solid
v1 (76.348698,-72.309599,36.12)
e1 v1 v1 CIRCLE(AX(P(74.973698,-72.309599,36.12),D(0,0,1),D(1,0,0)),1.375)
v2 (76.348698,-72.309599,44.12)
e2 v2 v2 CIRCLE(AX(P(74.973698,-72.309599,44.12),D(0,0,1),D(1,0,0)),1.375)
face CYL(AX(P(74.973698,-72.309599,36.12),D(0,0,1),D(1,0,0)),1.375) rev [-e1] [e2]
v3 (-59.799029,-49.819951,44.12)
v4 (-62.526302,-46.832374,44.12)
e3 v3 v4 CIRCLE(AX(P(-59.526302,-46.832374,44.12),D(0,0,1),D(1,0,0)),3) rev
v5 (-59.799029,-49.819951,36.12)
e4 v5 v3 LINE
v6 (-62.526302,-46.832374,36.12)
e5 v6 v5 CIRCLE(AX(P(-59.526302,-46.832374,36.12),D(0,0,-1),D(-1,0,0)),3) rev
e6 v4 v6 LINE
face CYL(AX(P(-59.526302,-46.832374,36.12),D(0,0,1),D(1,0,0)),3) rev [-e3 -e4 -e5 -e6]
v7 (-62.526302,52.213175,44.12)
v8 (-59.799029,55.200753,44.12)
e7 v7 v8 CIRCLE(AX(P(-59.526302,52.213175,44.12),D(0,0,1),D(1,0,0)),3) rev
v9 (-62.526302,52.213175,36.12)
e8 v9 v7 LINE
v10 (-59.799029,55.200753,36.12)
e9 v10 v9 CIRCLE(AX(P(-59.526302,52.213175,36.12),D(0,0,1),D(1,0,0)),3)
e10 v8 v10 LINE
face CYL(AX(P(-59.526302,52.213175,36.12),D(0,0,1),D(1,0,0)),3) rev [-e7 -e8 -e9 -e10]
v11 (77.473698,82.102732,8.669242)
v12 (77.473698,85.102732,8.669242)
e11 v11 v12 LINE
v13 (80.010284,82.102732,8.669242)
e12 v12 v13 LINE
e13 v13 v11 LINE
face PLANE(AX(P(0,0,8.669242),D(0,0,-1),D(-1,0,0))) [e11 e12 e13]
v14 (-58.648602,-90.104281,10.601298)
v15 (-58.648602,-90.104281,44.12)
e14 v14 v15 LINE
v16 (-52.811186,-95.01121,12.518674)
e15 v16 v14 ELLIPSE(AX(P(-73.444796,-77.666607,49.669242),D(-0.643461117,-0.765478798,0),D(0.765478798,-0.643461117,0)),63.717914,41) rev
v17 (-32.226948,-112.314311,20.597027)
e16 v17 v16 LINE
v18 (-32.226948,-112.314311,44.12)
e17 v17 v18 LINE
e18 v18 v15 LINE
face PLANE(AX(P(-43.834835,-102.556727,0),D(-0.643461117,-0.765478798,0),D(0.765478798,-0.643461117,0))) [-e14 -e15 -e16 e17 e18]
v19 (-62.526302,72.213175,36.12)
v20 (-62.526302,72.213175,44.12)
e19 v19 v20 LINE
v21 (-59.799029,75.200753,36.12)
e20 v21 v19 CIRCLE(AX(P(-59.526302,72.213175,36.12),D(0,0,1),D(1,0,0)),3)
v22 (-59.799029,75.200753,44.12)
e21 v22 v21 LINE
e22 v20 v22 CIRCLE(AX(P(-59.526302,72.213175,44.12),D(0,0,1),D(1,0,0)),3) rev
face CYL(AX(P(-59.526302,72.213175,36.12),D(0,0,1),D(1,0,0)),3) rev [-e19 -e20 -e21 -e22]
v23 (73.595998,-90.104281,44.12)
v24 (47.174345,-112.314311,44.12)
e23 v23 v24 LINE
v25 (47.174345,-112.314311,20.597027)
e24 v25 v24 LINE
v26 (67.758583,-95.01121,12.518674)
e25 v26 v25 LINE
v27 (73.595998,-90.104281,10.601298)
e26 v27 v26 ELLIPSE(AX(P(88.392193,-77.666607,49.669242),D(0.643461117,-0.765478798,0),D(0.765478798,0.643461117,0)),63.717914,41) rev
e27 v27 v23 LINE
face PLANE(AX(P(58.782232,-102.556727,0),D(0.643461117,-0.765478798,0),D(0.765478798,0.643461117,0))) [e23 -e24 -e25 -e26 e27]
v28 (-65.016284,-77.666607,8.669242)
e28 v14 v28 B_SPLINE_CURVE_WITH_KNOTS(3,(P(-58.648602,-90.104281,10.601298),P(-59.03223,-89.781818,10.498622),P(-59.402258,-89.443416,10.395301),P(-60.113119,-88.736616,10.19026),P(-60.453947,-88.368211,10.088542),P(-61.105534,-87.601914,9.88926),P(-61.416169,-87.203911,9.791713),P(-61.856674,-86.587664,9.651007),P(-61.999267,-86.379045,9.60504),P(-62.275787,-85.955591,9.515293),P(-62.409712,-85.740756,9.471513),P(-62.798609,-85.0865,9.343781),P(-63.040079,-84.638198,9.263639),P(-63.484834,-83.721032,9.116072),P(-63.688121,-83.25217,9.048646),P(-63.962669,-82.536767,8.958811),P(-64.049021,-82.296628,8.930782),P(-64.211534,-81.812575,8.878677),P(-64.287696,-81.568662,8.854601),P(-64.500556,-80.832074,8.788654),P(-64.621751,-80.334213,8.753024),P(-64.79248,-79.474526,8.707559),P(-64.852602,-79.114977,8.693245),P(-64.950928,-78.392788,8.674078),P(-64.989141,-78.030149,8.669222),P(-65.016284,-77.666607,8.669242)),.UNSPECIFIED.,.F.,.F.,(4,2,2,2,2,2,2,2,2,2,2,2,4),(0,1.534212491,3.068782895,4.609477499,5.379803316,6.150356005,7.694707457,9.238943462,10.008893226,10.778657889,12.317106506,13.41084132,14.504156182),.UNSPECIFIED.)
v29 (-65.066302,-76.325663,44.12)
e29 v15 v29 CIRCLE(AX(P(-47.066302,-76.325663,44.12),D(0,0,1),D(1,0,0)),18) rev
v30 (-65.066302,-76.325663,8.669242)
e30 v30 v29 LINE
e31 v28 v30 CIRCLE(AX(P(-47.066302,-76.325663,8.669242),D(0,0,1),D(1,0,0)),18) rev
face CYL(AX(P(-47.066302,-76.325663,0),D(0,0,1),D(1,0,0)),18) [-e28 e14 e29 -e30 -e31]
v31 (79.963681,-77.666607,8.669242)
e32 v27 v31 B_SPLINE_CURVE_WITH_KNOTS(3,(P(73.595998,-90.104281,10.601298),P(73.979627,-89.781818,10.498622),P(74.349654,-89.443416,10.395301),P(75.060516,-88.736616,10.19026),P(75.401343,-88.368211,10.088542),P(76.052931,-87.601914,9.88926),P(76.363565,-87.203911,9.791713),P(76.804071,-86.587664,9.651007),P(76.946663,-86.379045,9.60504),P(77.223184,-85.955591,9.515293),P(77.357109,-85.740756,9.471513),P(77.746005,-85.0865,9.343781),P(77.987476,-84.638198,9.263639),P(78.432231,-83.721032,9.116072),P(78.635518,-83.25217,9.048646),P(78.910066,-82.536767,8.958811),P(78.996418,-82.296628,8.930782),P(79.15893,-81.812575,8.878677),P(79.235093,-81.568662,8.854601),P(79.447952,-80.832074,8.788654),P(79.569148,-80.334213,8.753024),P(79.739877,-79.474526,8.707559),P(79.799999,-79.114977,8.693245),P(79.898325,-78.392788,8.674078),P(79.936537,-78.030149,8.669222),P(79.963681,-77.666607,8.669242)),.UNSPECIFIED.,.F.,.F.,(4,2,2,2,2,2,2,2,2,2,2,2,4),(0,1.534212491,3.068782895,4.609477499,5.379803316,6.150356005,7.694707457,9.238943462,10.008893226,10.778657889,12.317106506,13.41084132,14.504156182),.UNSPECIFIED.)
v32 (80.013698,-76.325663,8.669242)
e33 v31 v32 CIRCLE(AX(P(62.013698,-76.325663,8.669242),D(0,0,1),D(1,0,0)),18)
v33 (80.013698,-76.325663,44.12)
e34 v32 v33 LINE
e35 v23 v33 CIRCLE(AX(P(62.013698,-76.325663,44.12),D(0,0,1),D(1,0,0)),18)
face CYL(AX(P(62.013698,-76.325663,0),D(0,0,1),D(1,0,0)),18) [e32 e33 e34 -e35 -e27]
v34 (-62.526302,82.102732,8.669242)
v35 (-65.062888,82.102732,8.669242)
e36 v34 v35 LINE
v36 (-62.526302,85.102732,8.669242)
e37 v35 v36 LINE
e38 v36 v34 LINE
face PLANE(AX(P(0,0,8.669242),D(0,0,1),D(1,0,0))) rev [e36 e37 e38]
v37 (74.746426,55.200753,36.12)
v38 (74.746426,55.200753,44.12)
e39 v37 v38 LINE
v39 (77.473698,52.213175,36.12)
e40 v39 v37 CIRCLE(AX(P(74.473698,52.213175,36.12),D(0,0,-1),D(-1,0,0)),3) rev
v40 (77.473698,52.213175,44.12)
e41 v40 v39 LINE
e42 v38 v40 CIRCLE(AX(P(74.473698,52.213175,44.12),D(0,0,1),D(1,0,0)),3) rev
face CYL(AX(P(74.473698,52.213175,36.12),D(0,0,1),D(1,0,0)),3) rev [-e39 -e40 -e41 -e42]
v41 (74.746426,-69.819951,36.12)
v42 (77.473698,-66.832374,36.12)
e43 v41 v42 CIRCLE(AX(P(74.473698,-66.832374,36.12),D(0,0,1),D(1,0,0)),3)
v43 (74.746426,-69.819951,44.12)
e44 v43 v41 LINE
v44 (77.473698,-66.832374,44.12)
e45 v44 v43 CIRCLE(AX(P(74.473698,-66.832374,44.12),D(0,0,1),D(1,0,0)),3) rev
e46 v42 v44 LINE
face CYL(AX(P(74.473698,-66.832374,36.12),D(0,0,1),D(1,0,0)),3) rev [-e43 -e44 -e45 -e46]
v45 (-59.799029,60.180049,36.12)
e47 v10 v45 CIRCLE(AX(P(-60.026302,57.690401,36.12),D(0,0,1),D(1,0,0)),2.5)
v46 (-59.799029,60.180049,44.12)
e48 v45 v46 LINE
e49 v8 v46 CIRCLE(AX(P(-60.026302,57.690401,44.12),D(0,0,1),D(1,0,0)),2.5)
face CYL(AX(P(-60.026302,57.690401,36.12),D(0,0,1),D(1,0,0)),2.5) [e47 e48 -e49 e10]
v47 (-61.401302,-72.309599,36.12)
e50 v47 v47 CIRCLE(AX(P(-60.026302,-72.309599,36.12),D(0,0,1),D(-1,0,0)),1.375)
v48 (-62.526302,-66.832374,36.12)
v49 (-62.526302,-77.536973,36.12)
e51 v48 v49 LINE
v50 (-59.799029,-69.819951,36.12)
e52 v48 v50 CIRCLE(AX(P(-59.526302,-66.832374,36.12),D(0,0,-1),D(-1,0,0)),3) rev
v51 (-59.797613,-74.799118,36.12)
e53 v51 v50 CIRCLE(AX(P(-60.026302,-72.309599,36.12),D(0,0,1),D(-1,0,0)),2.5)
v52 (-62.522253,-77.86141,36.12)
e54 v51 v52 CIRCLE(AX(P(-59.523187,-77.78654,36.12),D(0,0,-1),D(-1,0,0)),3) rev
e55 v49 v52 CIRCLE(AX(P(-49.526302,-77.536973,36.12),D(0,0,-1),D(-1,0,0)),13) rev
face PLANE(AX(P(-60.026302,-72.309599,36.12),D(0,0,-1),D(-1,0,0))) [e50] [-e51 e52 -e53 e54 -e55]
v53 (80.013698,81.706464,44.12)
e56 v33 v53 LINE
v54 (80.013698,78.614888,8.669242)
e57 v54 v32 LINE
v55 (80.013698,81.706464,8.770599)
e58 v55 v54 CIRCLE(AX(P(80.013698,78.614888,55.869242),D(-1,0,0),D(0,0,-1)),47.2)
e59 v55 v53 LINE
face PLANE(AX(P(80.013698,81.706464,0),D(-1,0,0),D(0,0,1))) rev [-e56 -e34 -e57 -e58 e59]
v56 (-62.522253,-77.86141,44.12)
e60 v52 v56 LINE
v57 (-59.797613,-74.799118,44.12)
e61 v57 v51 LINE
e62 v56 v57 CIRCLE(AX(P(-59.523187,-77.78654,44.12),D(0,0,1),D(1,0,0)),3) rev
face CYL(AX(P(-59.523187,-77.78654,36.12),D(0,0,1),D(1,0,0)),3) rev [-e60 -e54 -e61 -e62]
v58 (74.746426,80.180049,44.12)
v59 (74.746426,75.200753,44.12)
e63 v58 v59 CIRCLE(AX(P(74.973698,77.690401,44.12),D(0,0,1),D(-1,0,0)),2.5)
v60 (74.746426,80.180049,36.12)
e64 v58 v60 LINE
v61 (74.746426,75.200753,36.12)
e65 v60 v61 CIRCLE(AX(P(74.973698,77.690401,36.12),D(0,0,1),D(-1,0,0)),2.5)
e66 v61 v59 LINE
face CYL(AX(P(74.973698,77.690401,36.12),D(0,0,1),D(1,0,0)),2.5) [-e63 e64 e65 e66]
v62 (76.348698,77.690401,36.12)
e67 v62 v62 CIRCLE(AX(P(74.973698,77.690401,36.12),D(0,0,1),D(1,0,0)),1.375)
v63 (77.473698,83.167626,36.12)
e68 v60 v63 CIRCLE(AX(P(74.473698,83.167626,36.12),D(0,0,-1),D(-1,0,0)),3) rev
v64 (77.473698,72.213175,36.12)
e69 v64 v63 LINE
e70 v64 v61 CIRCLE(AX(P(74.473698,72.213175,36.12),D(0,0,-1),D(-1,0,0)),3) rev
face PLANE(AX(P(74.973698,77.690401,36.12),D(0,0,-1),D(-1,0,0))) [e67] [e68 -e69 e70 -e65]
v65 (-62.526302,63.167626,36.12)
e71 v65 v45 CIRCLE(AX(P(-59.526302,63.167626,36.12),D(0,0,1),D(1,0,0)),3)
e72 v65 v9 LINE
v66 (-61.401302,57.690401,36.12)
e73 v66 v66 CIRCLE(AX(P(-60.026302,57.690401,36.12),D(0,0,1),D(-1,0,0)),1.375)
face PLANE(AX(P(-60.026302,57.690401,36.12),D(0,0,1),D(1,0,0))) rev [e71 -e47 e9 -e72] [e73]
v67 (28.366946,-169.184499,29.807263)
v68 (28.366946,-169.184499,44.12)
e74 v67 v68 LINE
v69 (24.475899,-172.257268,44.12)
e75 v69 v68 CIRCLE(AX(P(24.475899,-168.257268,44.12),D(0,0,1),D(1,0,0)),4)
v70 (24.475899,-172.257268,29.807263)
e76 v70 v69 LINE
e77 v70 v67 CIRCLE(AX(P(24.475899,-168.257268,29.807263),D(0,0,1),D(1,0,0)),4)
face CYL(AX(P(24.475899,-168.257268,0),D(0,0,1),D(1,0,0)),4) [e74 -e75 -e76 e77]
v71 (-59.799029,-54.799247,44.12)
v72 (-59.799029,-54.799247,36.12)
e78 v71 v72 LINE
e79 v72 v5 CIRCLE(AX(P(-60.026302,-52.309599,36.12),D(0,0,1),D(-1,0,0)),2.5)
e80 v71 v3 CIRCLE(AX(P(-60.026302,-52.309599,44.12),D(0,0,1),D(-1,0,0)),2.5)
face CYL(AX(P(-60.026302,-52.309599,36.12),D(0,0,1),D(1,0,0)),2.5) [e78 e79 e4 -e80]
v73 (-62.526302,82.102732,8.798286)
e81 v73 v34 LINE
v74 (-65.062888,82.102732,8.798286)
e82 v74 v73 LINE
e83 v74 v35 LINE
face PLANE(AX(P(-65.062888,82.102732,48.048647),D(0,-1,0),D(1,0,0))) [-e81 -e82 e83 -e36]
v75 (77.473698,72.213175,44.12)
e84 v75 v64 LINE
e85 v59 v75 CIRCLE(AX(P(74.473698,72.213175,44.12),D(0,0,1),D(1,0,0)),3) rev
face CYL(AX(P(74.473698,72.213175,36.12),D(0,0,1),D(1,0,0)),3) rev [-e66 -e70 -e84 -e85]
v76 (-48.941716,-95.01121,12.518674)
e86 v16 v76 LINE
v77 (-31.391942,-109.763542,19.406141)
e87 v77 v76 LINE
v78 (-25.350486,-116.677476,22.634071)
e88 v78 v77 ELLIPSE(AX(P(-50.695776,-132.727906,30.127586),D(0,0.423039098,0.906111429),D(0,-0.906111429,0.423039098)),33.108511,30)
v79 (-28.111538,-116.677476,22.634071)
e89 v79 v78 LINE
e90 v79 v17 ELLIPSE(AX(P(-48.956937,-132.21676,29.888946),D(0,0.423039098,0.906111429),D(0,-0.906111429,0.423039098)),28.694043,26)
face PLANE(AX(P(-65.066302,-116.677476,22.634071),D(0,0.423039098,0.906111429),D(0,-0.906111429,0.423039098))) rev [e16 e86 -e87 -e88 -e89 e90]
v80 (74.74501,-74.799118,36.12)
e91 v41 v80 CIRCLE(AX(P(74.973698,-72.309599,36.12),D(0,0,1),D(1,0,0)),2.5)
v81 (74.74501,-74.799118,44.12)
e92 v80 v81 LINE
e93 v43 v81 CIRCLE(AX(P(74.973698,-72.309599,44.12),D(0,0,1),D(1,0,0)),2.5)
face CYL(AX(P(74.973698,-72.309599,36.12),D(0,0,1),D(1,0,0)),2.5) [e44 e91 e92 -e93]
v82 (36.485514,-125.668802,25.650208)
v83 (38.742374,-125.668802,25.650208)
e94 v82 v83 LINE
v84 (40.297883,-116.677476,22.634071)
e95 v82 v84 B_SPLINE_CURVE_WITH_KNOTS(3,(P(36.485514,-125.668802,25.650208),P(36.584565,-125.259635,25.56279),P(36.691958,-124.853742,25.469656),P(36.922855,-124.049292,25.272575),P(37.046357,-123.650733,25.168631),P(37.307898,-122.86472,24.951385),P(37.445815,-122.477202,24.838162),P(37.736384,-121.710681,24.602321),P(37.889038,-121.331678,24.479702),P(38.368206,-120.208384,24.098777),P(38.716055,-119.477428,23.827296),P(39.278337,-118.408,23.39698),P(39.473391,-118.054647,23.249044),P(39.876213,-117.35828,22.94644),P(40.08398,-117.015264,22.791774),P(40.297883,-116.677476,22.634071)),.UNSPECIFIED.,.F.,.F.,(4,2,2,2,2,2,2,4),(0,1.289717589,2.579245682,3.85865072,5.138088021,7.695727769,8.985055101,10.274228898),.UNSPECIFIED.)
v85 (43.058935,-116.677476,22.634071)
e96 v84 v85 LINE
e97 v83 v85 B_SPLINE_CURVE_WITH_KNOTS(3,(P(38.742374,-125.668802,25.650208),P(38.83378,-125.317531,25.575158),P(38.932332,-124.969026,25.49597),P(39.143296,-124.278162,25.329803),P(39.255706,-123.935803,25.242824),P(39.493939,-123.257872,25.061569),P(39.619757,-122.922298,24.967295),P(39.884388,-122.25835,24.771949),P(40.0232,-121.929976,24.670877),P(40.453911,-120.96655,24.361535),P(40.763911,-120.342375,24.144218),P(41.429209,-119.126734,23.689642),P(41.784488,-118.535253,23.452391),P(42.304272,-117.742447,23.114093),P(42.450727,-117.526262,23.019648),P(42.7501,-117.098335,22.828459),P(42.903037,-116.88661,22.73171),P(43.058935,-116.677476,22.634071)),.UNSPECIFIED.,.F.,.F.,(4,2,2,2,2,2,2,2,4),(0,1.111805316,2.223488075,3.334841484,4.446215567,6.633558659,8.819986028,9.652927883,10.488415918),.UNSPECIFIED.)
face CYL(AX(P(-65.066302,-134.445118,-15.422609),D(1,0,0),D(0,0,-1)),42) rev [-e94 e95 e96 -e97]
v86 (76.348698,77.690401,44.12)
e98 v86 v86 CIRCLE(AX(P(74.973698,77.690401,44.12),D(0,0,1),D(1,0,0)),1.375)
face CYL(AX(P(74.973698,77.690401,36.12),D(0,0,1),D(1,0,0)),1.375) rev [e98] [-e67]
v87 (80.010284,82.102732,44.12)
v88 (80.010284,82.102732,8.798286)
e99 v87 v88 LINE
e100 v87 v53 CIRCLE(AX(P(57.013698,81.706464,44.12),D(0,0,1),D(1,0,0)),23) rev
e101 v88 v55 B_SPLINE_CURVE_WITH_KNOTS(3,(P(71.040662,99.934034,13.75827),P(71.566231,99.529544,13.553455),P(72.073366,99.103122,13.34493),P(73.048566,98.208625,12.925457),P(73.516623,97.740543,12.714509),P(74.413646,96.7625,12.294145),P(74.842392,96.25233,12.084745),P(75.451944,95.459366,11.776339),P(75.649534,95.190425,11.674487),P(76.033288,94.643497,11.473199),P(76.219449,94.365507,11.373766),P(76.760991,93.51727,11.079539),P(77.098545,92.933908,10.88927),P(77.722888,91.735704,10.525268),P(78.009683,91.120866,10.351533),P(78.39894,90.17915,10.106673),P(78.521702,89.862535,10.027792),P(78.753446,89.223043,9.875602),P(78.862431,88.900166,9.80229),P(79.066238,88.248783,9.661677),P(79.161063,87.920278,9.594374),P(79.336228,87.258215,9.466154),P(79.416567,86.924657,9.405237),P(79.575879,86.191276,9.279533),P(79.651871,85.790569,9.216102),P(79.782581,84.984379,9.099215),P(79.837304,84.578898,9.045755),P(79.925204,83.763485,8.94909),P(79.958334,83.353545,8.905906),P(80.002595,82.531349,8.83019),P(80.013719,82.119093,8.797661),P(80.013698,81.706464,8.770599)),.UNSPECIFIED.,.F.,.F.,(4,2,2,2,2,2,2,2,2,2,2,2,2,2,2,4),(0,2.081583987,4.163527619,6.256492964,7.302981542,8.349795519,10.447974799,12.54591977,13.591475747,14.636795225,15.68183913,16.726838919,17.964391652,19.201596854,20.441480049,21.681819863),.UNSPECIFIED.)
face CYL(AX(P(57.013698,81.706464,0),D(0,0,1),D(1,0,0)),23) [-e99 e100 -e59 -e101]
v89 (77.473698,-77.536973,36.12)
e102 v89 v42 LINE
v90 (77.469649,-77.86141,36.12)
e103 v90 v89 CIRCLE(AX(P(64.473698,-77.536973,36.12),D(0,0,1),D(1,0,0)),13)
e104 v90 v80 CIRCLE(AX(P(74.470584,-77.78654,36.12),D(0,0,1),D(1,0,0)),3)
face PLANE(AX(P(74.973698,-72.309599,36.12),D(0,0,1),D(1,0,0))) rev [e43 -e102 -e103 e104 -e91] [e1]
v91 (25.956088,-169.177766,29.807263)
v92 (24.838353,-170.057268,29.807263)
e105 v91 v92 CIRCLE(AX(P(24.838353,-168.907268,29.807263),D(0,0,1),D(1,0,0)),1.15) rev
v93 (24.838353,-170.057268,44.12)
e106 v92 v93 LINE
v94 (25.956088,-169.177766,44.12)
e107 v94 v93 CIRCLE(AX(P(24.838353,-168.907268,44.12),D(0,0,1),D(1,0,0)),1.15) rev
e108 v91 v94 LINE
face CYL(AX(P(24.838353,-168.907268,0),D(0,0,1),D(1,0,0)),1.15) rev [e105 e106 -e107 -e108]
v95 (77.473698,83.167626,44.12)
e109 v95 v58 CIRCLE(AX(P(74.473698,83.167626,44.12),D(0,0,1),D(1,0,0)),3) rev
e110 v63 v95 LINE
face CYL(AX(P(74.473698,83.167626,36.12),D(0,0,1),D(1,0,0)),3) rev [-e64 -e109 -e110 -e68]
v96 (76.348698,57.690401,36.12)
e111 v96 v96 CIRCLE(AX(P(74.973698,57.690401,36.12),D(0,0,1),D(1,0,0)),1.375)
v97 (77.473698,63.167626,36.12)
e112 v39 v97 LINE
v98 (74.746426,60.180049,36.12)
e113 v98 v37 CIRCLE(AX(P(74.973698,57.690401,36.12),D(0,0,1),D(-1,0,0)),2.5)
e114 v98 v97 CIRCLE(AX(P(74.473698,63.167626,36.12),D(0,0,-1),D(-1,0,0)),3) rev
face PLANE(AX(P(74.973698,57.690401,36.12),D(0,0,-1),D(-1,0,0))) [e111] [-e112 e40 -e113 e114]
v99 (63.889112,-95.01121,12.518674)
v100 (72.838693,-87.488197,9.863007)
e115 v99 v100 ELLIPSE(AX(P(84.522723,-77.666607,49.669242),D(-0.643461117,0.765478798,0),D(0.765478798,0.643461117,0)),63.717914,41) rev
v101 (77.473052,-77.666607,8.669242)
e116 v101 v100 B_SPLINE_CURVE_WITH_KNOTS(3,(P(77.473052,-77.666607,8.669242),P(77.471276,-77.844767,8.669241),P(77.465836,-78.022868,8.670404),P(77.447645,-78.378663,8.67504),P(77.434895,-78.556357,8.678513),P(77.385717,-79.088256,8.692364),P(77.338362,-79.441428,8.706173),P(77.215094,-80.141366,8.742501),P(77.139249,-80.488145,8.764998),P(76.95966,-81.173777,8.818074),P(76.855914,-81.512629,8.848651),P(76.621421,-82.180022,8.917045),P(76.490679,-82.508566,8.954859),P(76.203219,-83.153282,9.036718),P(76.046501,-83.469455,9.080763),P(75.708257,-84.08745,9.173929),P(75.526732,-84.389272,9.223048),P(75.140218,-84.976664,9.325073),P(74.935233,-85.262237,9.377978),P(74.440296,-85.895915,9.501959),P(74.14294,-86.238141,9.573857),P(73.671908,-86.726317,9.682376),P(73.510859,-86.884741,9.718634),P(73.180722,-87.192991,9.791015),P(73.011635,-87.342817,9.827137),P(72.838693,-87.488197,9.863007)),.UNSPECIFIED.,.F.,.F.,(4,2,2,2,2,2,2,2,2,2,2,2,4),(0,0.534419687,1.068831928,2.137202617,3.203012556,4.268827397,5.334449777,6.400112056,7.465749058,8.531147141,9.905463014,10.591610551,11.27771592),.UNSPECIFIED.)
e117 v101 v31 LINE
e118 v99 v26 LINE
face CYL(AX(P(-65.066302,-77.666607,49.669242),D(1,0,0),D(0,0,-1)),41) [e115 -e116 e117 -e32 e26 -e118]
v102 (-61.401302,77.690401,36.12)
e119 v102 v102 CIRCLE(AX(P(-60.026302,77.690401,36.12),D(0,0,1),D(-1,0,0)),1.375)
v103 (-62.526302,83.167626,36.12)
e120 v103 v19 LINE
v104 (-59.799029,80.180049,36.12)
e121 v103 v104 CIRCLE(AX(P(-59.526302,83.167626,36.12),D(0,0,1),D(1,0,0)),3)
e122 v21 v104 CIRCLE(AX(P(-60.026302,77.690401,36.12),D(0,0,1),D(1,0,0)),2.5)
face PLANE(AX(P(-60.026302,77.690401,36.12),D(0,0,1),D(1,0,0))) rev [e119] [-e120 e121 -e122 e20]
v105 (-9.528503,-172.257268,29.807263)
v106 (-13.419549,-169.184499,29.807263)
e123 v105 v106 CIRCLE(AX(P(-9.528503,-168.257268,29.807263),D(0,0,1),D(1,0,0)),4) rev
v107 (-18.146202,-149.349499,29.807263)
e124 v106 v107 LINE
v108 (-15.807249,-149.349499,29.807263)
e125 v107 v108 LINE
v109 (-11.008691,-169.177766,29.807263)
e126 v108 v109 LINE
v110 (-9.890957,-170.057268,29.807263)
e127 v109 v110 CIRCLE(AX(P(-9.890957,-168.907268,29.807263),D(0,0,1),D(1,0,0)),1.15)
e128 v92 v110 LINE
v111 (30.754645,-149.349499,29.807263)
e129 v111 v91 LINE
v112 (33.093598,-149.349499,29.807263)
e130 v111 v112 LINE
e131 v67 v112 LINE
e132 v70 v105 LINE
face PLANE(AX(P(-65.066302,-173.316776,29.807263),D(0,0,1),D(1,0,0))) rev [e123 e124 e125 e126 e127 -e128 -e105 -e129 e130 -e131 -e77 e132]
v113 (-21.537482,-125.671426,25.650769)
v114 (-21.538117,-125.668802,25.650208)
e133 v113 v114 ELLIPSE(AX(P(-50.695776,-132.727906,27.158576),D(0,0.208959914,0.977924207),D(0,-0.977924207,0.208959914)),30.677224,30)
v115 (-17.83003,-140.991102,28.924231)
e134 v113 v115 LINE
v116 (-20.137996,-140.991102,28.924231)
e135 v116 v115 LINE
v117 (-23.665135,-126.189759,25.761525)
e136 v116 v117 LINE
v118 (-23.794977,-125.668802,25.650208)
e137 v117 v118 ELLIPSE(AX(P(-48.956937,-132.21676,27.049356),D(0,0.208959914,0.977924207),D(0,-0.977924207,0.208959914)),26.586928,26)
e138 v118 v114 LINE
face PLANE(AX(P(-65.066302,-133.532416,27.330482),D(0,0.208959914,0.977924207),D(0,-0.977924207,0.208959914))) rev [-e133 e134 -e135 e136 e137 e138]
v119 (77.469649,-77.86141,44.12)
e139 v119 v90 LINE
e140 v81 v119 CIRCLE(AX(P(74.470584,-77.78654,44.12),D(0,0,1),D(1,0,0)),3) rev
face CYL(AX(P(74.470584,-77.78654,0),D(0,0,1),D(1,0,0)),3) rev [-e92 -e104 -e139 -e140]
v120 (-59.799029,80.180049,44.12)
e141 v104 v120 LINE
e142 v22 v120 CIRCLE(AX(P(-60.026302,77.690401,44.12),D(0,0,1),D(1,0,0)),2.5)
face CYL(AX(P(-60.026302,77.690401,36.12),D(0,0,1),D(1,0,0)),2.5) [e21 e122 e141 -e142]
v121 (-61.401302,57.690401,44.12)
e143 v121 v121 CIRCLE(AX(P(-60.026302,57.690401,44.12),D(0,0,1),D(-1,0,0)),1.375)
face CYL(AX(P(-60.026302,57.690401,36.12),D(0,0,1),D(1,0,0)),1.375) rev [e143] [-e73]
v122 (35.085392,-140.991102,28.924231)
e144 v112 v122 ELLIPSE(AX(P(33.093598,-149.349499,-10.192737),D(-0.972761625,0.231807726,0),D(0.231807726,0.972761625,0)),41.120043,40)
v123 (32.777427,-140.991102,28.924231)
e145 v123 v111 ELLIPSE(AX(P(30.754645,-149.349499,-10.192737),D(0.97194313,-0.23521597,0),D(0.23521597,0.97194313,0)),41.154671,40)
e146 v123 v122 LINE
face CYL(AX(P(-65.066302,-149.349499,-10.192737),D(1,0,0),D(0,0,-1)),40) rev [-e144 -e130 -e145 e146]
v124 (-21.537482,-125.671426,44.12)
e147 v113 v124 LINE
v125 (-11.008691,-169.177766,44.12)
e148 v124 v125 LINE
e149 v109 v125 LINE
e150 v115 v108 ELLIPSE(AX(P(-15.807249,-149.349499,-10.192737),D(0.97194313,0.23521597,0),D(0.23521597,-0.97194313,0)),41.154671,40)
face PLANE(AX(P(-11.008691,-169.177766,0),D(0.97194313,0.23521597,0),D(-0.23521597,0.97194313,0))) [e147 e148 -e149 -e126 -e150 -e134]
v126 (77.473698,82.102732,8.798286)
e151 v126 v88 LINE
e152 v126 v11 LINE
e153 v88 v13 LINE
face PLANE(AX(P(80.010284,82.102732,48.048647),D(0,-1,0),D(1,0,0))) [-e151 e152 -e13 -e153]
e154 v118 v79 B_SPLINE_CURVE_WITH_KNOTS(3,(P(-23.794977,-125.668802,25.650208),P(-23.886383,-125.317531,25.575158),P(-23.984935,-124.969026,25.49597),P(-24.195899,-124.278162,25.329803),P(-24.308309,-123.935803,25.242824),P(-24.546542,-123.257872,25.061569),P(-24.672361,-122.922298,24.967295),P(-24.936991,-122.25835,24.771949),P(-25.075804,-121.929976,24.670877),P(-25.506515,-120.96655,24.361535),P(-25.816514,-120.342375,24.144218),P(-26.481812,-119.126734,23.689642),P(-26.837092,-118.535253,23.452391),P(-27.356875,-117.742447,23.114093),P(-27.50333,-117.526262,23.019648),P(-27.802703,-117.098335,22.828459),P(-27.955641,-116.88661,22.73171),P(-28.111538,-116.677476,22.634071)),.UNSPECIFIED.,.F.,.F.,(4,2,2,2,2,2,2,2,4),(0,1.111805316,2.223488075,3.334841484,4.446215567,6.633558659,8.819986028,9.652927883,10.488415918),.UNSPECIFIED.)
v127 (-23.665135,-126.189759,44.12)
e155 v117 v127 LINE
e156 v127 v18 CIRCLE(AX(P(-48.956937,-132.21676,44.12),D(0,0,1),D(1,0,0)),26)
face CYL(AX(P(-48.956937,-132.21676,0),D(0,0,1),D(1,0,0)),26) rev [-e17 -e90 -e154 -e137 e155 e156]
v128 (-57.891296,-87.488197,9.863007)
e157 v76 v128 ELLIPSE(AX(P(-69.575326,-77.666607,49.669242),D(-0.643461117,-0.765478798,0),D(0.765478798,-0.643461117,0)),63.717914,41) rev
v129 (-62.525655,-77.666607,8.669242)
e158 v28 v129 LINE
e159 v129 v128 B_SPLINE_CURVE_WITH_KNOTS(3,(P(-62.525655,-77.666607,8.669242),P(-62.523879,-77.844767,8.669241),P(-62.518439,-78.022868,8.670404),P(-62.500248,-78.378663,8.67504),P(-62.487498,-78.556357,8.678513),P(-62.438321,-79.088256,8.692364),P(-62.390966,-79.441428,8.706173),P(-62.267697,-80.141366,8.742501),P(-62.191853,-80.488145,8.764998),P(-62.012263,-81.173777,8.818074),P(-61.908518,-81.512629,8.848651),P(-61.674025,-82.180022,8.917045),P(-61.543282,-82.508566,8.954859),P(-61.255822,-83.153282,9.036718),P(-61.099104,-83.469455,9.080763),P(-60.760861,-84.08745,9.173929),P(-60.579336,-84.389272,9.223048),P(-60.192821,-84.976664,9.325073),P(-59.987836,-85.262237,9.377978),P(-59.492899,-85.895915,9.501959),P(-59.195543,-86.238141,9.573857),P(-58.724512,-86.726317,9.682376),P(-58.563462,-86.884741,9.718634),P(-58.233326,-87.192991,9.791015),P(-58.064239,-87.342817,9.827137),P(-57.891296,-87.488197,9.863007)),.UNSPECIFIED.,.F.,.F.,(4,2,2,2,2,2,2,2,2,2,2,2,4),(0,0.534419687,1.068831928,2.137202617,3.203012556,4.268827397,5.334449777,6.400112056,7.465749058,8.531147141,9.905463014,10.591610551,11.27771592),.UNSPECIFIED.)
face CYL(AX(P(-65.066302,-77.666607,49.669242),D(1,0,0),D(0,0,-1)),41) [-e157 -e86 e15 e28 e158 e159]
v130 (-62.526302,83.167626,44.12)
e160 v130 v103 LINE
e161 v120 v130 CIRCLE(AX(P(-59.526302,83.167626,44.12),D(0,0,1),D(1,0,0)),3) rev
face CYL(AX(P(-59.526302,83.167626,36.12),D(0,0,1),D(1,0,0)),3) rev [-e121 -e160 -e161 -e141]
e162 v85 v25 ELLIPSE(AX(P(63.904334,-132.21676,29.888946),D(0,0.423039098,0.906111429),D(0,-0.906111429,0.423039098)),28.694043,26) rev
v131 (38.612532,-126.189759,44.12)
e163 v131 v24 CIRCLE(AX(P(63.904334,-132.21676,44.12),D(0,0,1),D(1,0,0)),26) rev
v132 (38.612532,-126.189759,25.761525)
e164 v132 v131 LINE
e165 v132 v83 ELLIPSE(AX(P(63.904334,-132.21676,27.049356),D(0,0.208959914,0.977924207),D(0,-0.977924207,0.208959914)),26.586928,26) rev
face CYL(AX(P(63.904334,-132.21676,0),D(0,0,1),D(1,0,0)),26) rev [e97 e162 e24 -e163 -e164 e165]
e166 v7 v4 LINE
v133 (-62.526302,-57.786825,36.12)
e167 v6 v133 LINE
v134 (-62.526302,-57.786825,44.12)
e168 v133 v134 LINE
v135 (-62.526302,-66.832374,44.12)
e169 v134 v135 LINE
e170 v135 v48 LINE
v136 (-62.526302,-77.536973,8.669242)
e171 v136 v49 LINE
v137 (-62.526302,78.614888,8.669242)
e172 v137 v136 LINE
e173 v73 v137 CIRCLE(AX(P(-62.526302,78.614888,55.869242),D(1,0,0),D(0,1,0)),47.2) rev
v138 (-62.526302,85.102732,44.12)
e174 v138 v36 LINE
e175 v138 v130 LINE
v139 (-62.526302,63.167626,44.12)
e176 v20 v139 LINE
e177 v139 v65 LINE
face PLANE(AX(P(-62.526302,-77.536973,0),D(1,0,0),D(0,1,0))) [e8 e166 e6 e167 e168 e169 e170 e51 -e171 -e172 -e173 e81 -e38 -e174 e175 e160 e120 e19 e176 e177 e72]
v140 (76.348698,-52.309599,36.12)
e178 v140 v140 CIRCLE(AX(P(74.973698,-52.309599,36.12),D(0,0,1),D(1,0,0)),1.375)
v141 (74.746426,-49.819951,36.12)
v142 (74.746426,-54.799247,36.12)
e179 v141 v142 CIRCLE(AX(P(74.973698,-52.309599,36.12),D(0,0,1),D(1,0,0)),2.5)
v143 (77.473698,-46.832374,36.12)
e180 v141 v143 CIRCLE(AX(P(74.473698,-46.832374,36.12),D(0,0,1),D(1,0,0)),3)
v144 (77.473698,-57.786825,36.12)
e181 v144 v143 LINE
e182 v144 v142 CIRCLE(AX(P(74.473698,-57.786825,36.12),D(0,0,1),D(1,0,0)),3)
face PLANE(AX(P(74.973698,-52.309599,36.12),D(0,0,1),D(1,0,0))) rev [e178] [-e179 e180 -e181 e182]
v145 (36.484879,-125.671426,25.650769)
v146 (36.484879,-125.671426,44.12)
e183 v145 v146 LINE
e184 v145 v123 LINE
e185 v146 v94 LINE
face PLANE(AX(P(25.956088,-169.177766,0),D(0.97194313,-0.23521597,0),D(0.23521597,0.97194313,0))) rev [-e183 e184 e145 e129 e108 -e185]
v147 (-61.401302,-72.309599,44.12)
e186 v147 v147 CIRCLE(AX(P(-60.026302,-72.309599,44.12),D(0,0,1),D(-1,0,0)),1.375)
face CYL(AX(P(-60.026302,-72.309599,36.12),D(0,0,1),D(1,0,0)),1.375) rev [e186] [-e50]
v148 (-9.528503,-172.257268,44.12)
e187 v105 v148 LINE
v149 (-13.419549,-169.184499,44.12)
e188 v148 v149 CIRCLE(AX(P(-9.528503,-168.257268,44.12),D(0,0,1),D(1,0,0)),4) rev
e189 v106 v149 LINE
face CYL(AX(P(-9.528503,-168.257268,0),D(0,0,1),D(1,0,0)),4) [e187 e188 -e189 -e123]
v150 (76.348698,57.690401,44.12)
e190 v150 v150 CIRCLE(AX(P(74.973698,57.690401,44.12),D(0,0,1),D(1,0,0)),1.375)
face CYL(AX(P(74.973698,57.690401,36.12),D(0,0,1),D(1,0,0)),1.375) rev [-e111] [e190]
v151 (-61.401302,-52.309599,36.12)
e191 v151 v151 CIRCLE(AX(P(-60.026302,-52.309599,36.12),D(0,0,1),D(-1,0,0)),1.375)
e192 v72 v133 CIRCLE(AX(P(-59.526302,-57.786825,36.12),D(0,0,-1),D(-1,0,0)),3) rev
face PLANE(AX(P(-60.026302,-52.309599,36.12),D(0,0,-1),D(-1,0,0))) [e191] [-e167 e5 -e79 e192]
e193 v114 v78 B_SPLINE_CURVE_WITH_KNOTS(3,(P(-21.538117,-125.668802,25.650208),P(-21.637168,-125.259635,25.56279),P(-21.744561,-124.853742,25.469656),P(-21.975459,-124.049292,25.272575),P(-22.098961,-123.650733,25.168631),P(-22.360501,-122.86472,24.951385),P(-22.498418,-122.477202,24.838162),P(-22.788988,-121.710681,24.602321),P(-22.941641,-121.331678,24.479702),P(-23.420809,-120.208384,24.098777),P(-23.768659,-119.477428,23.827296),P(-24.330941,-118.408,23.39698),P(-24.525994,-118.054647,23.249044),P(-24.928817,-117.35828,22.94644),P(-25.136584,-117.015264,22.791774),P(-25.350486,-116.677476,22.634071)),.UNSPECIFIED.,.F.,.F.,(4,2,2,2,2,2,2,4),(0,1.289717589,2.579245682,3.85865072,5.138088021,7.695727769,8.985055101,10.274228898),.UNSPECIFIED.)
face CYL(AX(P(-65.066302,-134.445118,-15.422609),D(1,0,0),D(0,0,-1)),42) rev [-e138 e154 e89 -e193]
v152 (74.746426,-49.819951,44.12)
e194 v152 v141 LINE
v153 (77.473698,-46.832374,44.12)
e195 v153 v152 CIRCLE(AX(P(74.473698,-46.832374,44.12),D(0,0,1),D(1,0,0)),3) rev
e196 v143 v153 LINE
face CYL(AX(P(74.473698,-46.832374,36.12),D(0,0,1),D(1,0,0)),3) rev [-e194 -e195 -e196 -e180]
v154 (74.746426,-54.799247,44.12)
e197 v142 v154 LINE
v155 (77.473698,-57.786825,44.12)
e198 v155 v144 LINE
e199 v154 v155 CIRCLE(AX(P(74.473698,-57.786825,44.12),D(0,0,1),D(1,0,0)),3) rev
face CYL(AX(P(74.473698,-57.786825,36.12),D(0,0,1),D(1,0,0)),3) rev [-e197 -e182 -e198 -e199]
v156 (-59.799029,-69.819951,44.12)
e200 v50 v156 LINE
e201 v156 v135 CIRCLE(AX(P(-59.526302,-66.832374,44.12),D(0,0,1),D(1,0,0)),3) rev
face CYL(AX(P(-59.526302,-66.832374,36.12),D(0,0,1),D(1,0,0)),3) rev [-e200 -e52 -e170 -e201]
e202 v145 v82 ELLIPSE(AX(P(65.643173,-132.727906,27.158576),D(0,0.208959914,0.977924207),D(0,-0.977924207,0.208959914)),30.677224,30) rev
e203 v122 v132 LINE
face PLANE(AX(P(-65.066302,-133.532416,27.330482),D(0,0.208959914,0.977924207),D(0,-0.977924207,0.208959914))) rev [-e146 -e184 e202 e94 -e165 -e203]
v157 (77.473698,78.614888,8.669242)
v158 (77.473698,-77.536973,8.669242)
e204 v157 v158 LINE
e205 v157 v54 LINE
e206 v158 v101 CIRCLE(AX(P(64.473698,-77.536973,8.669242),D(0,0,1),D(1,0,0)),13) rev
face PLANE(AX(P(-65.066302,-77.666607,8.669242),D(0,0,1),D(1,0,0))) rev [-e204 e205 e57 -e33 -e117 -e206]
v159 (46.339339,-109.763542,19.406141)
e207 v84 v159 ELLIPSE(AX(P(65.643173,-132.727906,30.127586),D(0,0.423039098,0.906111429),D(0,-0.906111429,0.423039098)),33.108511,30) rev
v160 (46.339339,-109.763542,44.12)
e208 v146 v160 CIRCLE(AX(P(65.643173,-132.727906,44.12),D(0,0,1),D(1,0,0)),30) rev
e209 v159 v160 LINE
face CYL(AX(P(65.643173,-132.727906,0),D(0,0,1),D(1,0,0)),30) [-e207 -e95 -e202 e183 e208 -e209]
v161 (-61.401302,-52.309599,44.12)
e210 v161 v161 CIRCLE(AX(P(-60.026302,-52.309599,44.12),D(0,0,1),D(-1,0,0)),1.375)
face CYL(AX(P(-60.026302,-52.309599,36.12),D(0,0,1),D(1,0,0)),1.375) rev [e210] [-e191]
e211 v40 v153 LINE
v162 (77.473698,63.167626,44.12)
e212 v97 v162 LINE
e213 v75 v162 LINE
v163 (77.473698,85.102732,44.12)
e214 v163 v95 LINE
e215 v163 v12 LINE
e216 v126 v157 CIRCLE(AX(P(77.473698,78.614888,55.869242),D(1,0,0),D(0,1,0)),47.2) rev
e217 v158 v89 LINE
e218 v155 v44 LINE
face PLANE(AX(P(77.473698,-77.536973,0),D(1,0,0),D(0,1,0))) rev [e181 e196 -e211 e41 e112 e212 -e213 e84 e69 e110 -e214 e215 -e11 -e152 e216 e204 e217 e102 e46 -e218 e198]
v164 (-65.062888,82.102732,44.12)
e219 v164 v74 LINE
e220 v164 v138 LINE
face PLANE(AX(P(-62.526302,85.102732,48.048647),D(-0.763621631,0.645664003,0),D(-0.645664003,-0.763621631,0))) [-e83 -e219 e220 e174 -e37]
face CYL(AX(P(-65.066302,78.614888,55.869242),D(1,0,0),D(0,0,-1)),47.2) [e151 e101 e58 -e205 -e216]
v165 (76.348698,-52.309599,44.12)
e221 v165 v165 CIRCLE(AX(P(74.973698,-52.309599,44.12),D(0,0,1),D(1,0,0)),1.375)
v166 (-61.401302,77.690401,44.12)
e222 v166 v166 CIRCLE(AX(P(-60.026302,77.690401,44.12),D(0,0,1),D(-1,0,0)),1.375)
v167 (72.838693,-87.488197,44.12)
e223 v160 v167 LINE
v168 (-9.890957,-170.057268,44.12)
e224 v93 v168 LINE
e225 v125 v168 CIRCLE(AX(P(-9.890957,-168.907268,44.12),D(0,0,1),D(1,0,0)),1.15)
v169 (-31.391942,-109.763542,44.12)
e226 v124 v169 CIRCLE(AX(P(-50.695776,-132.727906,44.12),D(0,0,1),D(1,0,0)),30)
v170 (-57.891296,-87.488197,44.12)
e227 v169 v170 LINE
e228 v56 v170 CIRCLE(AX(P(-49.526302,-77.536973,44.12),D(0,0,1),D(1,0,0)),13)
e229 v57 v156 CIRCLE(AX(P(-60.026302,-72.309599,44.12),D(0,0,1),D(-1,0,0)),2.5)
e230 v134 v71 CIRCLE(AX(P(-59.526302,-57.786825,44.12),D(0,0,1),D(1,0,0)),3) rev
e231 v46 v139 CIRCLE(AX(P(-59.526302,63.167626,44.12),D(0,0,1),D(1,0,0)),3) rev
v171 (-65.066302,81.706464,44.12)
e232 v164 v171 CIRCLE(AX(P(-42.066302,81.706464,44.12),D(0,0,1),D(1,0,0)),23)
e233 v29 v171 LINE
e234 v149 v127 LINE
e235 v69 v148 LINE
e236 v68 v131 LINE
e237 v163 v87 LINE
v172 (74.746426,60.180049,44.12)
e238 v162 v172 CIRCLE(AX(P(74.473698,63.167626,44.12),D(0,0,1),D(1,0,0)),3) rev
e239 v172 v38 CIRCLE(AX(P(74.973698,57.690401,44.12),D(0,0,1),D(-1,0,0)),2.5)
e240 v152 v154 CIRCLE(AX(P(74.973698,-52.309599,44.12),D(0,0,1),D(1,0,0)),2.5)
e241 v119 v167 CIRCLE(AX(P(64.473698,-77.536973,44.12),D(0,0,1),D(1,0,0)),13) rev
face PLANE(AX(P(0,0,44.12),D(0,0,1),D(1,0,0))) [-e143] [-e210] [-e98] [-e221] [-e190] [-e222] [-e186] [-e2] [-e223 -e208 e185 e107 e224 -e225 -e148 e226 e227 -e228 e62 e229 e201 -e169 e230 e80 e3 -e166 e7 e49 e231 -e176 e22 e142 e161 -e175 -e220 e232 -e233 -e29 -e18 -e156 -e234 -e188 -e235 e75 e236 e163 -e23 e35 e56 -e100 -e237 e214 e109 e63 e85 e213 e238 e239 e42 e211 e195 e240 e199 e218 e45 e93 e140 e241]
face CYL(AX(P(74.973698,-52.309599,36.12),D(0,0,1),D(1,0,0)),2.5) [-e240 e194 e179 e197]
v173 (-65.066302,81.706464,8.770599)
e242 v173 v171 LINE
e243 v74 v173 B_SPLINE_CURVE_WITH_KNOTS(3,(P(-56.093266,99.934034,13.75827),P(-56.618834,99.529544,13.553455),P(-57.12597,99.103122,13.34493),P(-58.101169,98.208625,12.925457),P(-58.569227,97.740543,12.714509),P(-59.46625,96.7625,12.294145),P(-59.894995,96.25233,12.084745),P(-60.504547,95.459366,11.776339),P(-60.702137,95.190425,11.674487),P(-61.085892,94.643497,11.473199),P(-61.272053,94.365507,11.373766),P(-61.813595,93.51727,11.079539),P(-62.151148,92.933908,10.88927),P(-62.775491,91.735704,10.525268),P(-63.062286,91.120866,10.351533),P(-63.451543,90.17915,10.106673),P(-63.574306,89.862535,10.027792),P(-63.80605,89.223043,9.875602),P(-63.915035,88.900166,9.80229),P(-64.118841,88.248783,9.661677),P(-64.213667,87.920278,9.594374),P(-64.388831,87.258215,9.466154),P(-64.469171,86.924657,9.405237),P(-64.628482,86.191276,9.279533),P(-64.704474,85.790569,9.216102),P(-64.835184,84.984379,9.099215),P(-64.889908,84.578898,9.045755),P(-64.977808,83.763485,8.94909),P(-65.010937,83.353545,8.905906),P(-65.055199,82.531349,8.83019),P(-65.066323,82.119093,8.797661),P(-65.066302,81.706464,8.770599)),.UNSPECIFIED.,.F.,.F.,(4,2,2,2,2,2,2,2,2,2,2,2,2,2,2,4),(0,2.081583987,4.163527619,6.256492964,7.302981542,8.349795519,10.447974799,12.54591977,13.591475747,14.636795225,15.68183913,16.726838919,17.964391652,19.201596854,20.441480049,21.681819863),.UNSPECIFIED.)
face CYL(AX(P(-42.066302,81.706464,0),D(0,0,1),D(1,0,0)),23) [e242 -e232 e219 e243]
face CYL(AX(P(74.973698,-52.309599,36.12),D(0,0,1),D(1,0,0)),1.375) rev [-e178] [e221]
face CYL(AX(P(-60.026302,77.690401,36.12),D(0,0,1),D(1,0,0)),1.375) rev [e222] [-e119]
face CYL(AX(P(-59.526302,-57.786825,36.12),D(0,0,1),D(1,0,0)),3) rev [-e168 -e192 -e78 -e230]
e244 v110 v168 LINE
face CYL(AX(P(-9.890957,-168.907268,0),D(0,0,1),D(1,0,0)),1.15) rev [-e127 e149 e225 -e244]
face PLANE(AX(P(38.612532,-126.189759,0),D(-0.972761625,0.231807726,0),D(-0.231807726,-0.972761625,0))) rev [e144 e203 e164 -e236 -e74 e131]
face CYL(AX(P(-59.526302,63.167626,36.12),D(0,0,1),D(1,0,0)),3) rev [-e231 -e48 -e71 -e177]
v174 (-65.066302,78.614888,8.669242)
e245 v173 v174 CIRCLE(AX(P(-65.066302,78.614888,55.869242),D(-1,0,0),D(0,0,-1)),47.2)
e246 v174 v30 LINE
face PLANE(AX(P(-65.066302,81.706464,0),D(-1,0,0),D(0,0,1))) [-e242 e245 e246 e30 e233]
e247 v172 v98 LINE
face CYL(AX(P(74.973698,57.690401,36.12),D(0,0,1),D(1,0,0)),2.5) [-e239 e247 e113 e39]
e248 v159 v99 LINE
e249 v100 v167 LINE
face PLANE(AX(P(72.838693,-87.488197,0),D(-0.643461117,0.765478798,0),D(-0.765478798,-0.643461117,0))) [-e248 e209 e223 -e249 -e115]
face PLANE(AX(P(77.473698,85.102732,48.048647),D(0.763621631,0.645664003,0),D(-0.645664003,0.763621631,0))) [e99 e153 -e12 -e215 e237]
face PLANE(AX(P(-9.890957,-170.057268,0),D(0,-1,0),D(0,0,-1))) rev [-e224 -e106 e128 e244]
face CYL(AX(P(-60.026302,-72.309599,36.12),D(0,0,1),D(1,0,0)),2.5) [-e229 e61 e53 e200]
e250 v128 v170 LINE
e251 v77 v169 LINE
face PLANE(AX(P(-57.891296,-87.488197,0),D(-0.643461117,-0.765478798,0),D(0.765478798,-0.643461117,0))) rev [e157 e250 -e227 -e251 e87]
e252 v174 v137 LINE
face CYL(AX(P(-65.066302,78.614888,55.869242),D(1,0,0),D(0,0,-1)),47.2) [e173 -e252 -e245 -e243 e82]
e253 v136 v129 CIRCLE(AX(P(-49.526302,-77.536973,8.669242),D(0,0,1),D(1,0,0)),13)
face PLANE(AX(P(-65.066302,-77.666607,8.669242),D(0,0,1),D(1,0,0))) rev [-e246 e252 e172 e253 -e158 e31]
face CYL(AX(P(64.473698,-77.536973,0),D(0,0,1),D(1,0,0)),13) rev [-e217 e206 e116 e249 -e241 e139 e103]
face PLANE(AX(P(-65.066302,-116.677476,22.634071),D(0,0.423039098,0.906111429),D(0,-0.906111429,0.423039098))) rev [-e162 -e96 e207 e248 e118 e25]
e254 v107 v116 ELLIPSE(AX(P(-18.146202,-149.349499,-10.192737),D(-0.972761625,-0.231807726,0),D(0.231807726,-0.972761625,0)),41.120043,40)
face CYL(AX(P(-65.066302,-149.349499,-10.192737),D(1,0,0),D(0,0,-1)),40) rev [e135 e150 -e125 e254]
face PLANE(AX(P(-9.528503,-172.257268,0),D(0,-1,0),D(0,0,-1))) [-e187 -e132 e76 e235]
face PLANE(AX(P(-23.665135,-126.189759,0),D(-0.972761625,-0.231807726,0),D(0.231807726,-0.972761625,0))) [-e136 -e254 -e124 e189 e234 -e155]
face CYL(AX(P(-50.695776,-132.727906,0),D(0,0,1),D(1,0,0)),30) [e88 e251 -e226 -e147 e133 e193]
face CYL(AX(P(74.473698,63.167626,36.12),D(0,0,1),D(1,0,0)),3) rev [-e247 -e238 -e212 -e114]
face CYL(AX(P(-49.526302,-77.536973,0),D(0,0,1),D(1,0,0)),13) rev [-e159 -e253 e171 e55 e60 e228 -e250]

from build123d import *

# Parameters (mm, degrees)
BOSS_EXTRUDE4_DEPTH     = 60
CUT_EXTRUDE1_DEPTH      = 200.185236193
CUT_EXTRUDE1_DEPTH_BACK = 200.185236193
SKETCH8_W               = 377.363073988
SKETCH8_H               = 227.050506132
CUT_EXTRUDE2_DEPTH      = 15.88
CUT_EXTRUDE3_DEPTH      = 197.747566791
CUT_EXTRUDE3_DEPTH_BACK = 197.747566791
SKETCH9_W               = 130.37321108
SKETCH9_H               = 280.151546647
BOSS_EXTRUDE5_DEPTH     = 35.450757786
SKETCH12_R              = 1.375
BOSS_EXTRUDE6_DEPTH     = 8
FILLET1_R               = 3


with BuildPart() as part:
    # Sketch6 → Boss-Extrude4 (new body)
    with BuildSketch(Plane(origin=(0, 0, 60), x_dir=(0, 1, 0), z_dir=(0, 0, 1))):
        with BuildLine():
            Line((-102.556726727, -58.78223175), (-90.104281455, -73.5959984))
            ThreePointArc((-90.104281455, -73.5959984), (-83.925616968, -78.330582212), (-76.325663088, -80.013698287))
            Line((-76.325663088, -80.013698287), (81.706464258, -80.013698287))
            ThreePointArc((81.706464258, -80.013698287), (91.86470798, -77.648864496), (99.934033614, -71.040662156))
            Line((99.934033614, -71.040662156), (133.684497307, -27.183065922))
            ThreePointArc((133.684497307, -27.183065922), (134.470930527, -25.715449802), (134.742731928, -24.072739151))
            Line((134.742731928, -24.072739151), (134.742731928, 9.125342578))
            ThreePointArc((134.742731928, 9.125342578), (134.470930527, 10.768053229), (133.684497307, 12.235669349))
            Line((133.684497307, 12.235669349), (99.934033614, 56.093265582))
            ThreePointArc((99.934033614, 56.093265582), (91.86470798, 62.701467923), (81.706464258, 65.066301713))
            Line((81.706464258, 65.066301713), (-76.325663088, 65.066301713))
            ThreePointArc((-76.325663088, 65.066301713), (-83.925616968, 63.383185638), (-90.104281455, 58.648601826))
            Line((-90.104281455, 58.648601826), (-102.556726727, 43.834835176))
            Line((-102.556726727, 43.834835176), (-112.31431086, 32.226948432))
            ThreePointArc((-112.31431086, 32.226948432), (-118.563545676, 26.830262423), (-126.189758735, 23.665135246))
            Line((-126.189758735, 23.665135246), (-169.184498976, 13.419549157))
            ThreePointArc((-169.184498976, 13.419549157), (-171.396449782, 12.007522262), (-172.257268072, 9.528502659))
            Line((-172.257268072, 9.528502659), (-172.257268072, -24.475899233))
            ThreePointArc((-172.257268072, -24.475899233), (-171.396449782, -26.954918836), (-169.184498976, -28.366945731))
            Line((-169.184498976, -28.366945731), (-126.189758735, -38.61253182))
            ThreePointArc((-126.189758735, -38.61253182), (-118.563545676, -41.777658997), (-112.31431086, -47.174345005))
            Line((-112.31431086, -47.174345005), (-102.556726727, -58.78223175))
        make_face()
        with BuildLine():
            Line((-169.177766438, -25.956087723), (-125.671426431, -36.484878628))
            ThreePointArc((-125.671426431, -36.484878628), (-116.929476769, -40.140042352), (-109.763541599, -46.339338996))
            Line((-109.763541599, -46.339338996), (-87.488197255, -72.838692813))
            ThreePointArc((-87.488197255, -72.838692813), (-83.025828459, -76.258114455), (-77.536972879, -77.473698287))
            Line((-77.536972879, -77.473698287), (83.585331343, -77.473698287))
            ThreePointArc((83.585331343, -77.473698287), (91.030563019, -75.756647128), (96.971813087, -70.952348321))
            Line((96.971813087, -70.952348321), (130.310853005, -28.361704701))
            ThreePointArc((130.310853005, -28.361704701), (131.969092573, -25.312660918), (132.542731928, -21.889597327))
            Line((132.542731928, -21.889597327), (132.542731928, 6.942200754))
            ThreePointArc((132.542731928, 6.942200754), (131.969092573, 10.365264345), (130.310853005, 13.414308128))
            Line((130.310853005, 13.414308128), (96.971813087, 56.004951747))
            ThreePointArc((96.971813087, 56.004951747), (91.030563019, 60.809250555), (83.585331343, 62.526301713))
            Line((83.585331343, 62.526301713), (-77.536972879, 62.526301713))
            ThreePointArc((-77.536972879, 62.526301713), (-83.025828459, 61.310717881), (-87.488197255, 57.891296239))
            Line((-87.488197255, 57.891296239), (-109.763541599, 31.391942423))
            ThreePointArc((-109.763541599, 31.391942423), (-116.929476769, 25.192645778), (-125.671426431, 21.537482055))
            Line((-125.671426431, 21.537482055), (-169.177766438, 11.008691149))
            ThreePointArc((-169.177766438, 11.008691149), (-169.811030519, 10.602091868), (-170.057268072, 9.89095655))
            Line((-170.057268072, 9.89095655), (-170.057268072, -24.838353124))
            ThreePointArc((-170.057268072, -24.838353124), (-169.811030519, -25.549488441), (-169.177766438, -25.956087723))
        make_face(mode=Mode.SUBTRACT)
    extrude(amount=-BOSS_EXTRUDE4_DEPTH)

    # Sketch7 → Cut-Extrude1 (cut, two sides: drawn at the far end of the back side and taken through both)
    with BuildSketch(Plane.YZ.offset(-CUT_EXTRUDE1_DEPTH_BACK)):
        with BuildLine():
            Line((-173.316776267, 29.807263028), (-149.349499046, 29.807263028))
            ThreePointArc((-149.349499046, 29.807263028), (-145.147043271, 29.585892535), (-140.991102482, 28.924231301))
            Line((-140.991102482, 28.924231301), (-133.532416413, 27.330481612))
            Line((-133.532416413, 27.330481612), (-125.66880169, 25.650207982))
            ThreePointArc((-125.66880169, 25.650207982), (-121.087734224, 24.396737051), (-116.677475957, 22.634071304))
            Line((-116.677475957, 22.634071304), (-95.011210416, 12.518673634))
            ThreePointArc((-95.011210416, 12.518673634), (-86.549925694, 9.643167514), (-77.66660739, 8.669242214))
            Line((-77.66660739, 8.669242214), (78.614887506, 8.669242214))
            ThreePointArc((78.614887506, 8.669242214), (95.467441046, 11.780338405), (110.098388015, 20.703503267))
            Line((110.098388015, 20.703503267), (118.253034855, 28.004269173))
            ThreePointArc((118.253034855, 28.004269173), (122.189751518, 30.405205481), (126.724230967, 31.242301278))
            Line((126.724230967, 31.242301278), (135.253961988, 31.242301278))
            Line((135.253961988, 31.242301278), (135.253961988, -52.435838827))
            Line((135.253961988, -52.435838827), (-175.257268072, -52.435838827))
            Line((-175.257268072, -52.435838827), (-175.257268072, 29.807263028))
            Line((-175.257268072, 29.807263028), (-173.316776267, 29.807263028))
        make_face()
    extrude(amount=CUT_EXTRUDE1_DEPTH + CUT_EXTRUDE1_DEPTH_BACK, mode=Mode.SUBTRACT)

    # Sketch8 → Cut-Extrude2 (cut)
    with BuildSketch(Plane(origin=(0, 0, 60), x_dir=(0, -1, 0), z_dir=(0, 0, 1))):
        Rectangle(SKETCH8_W, SKETCH8_H)
    extrude(amount=-CUT_EXTRUDE2_DEPTH, mode=Mode.SUBTRACT)

    # Sketch9 → Cut-Extrude3 (cut, two sides: drawn at the far end of the back side and taken through both)
    with BuildSketch(Plane(origin=(0, 0, 60), x_dir=(0, -1, 0), z_dir=(0, 0, 1)).offset(-CUT_EXTRUDE3_DEPTH_BACK)):
        with Locations((-147.289337468, 7.473698286)):
            Rectangle(SKETCH9_W, SKETCH9_H)
    extrude(amount=CUT_EXTRUDE3_DEPTH + CUT_EXTRUDE3_DEPTH_BACK, mode=Mode.SUBTRACT)

    # Sketch10 → Boss-Extrude5 (add)
    with BuildSketch(Plane(origin=(0, 0, 8.669242214), x_dir=(1, 0, 0), z_dir=(0, 0, -1))):
        Polygon((80.01028438, -82.102731928), (77.473698287, -82.102731928), (77.473698287, -85.102731928), align=None)
        Polygon((-62.526301713, -82.102731928), (-62.526301713, -85.102731928), (-65.062887806, -82.102731928), align=None)
    extrude(amount=-BOSS_EXTRUDE5_DEPTH)

    # Sketch12 → Boss-Extrude6 (add)
    # profile 1 of 8: a face of its own
    with BuildSketch(Plane(origin=(0, 0, 44.12), x_dir=(0, -1, 0), z_dir=(0, 0, 1))):
        with BuildLine():
            Line((69.809599415, 74.973698287), (69.809599415, 77.473698287))
            Line((69.809599415, 77.473698287), (74.809599415, 77.473698287))
            Line((74.809599415, 77.473698287), (74.809599415, 74.973698287))
            ThreePointArc((74.809599415, 74.973698287), (72.309599415, 72.473698287), (69.809599415, 74.973698287))
        make_face()
        with Locations(Location((72.309599415, 74.973698287, 0), (0, 0, 90))):
            Circle(SKETCH12_R, mode=Mode.SUBTRACT)
    # profile 2 of 8: a face of its own
    with BuildSketch(Plane(origin=(0, 0, 44.12), x_dir=(0, -1, 0), z_dir=(0, 0, 1))):
        with BuildLine():
            Line((49.809599415, 74.973698287), (49.809599415, 77.473698287))
            Line((49.809599415, 77.473698287), (54.809599415, 77.473698287))
            Line((54.809599415, 77.473698287), (54.809599415, 74.973698287))
            ThreePointArc((54.809599415, 74.973698287), (52.309599415, 72.473698287), (49.809599415, 74.973698287))
        make_face()
        with Locations(Location((52.309599415, 74.973698287, 0), (0, 0, 90))):
            Circle(SKETCH12_R, mode=Mode.SUBTRACT)
    # profile 3 of 8: a face of its own
    with BuildSketch(Plane(origin=(0, 0, 44.12), x_dir=(0, -1, 0), z_dir=(0, 0, 1))):
        with BuildLine():
            Line((-80.190400585, 74.973698287), (-80.190400585, 77.473698287))
            Line((-80.190400585, 77.473698287), (-75.190400585, 77.473698287))
            Line((-75.190400585, 77.473698287), (-75.190400585, 74.973698287))
            ThreePointArc((-75.190400585, 74.973698287), (-77.690400585, 72.473698287), (-80.190400585, 74.973698287))
        make_face()
        with Locations(Location((-77.690400585, 74.973698287, 0), (0, 0, 90))):
            Circle(SKETCH12_R, mode=Mode.SUBTRACT)
    # profile 4 of 8: a face of its own
    with BuildSketch(Plane(origin=(0, 0, 44.12), x_dir=(0, -1, 0), z_dir=(0, 0, 1))):
        with BuildLine():
            Line((-60.190400585, 74.973698287), (-60.190400585, 77.473698287))
            Line((-60.190400585, 77.473698287), (-55.190400585, 77.473698287))
            Line((-55.190400585, 77.473698287), (-55.190400585, 74.973698287))
            ThreePointArc((-55.190400585, 74.973698287), (-57.690400585, 72.473698287), (-60.190400585, 74.973698287))
        make_face()
        with Locations(Location((-57.690400585, 74.973698287, 0), (0, 0, 90))):
            Circle(SKETCH12_R, mode=Mode.SUBTRACT)
    # profile 5 of 8: a face of its own
    with BuildSketch(Plane(origin=(0, 0, 44.12), x_dir=(0, -1, 0), z_dir=(0, 0, 1))):
        with BuildLine():
            Line((74.809599415, -60.026301713), (74.809599415, -62.526301713))
            Line((74.809599415, -62.526301713), (69.809599415, -62.526301713))
            Line((69.809599415, -62.526301713), (69.809599415, -60.026301713))
            ThreePointArc((69.809599415, -60.026301713), (72.309599415, -57.526301713), (74.809599415, -60.026301713))
        make_face()
        with Locations(Location((72.309599415, -60.026301713, 0), (0, 0, 270))):
            Circle(SKETCH12_R, mode=Mode.SUBTRACT)
    # profile 6 of 8: a face of its own
    with BuildSketch(Plane(origin=(0, 0, 44.12), x_dir=(0, -1, 0), z_dir=(0, 0, 1))):
        with BuildLine():
            Line((54.809599415, -60.026301713), (54.809599415, -62.526301713))
            Line((54.809599415, -62.526301713), (49.809599415, -62.526301713))
            Line((49.809599415, -62.526301713), (49.809599415, -60.026301713))
            ThreePointArc((49.809599415, -60.026301713), (52.309599415, -57.526301713), (54.809599415, -60.026301713))
        make_face()
        with Locations(Location((52.309599415, -60.026301713, 0), (0, 0, 270))):
            Circle(SKETCH12_R, mode=Mode.SUBTRACT)
    # profile 7 of 8: a face of its own
    with BuildSketch(Plane(origin=(0, 0, 44.12), x_dir=(0, -1, 0), z_dir=(0, 0, 1))):
        with BuildLine():
            Line((-55.190400585, -60.026301713), (-55.190400585, -62.526301713))
            Line((-55.190400585, -62.526301713), (-60.190400585, -62.526301713))
            Line((-60.190400585, -62.526301713), (-60.190400585, -60.026301713))
            ThreePointArc((-60.190400585, -60.026301713), (-57.690400585, -57.526301713), (-55.190400585, -60.026301713))
        make_face()
        with Locations(Location((-57.690400585, -60.026301713, 0), (0, 0, 270))):
            Circle(SKETCH12_R, mode=Mode.SUBTRACT)
    # profile 8 of 8: a face of its own
    with BuildSketch(Plane(origin=(0, 0, 44.12), x_dir=(0, -1, 0), z_dir=(0, 0, 1))):
        with BuildLine():
            Line((-75.190400585, -60.026301713), (-75.190400585, -62.526301713))
            Line((-75.190400585, -62.526301713), (-80.190400585, -62.526301713))
            Line((-80.190400585, -62.526301713), (-80.190400585, -60.026301713))
            ThreePointArc((-80.190400585, -60.026301713), (-77.690400585, -57.526301713), (-75.190400585, -60.026301713))
        make_face()
        with Locations(Location((-77.690400585, -60.026301713, 0), (0, 0, 270))):
            Circle(SKETCH12_R, mode=Mode.SUBTRACT)
    extrude(amount=-BOSS_EXTRUDE6_DEPTH)

    # Fillet1
    # the kernel refuses this fillet: 3 mm, written as the material it adds along each edge
    with BuildSketch(Plane(origin=(77.473698287, -69.809599415, 44.12), x_dir=(0, 1, 0), z_dir=(0, 0, -1)), Plane(origin=(77.473698287, -49.809599415, 44.12), x_dir=(0, 1, 0), z_dir=(0, 0, -1)), Plane(origin=(77.473698287, 60.190400585, 44.12), x_dir=(0, 1, 0), z_dir=(0, 0, -1)), Plane(origin=(77.473698287, 80.190400585, 44.12), x_dir=(0, 1, 0), z_dir=(0, 0, -1)), Plane(origin=(-62.526301713, 75.190400585, 44.12), x_dir=(0, -1, 0), z_dir=(0, 0, -1)), Plane(origin=(-62.526301713, 55.190400585, 44.12), x_dir=(0, -1, 0), z_dir=(0, 0, -1)), Plane(origin=(-62.526301713, -54.809599415, 44.12), x_dir=(0, -1, 0), z_dir=(0, 0, -1))) as fillet1_piece_1:
        with BuildLine():
            CenterArc((2.977225575, -3), FILLET1_R, 90, 84.78409143)
            Line((-0.010352011, -2.727272727), (-0.30910977, -2.7))
            ThreePointArc((-0.30910977, -2.7), (-0.3, -2.5), (-0.3, 0))
            Line((-0.3, 0), (0, 0.3))
            Line((0, 0.3), (2.977225575, 0.3))
            Line((2.977225575, 0.3), (2.977225575, 0))
        make_face()
    extrude(amount=8)
    with BuildSketch(Plane(origin=(77.473698287, -74.809599415, 44.12), x_dir=(-0.00132677412546265, -0.9999991198348227, 0), z_dir=(0, 0, -1))) as fillet1_piece_2:
        with BuildLine():
            CenterArc((2.980922188, 2.999162296), FILLET1_R, 185.172472526, 86.181570315)
            Line((-0.006861295, 2.72869999), (-0.305639643, 2.701653759))
            ThreePointArc((-0.305639643, 2.701653759), (-0.296682801, 2.500395832), (-0.299999736, 0.000398032))
            Line((-0.299999736, 0.000398032), (-0.000398032, -0.299999736))
            ThreePointArc((-0.000398032, -0.299999736), (2.726973031, -0.303618344), (3.058902198, -0.29991623))
            Line((3.058902198, -0.29991623), (3.051813106, 0))
        make_face()
    extrude(amount=8)
    with BuildSketch(Plane(origin=(77.473698287, -54.809599415, 44.12), x_dir=(0, -1, 0), z_dir=(0, 0, -1)), Plane(origin=(77.473698287, 55.190400585, 44.12), x_dir=(0, -1, 0), z_dir=(0, 0, -1)), Plane(origin=(77.473698287, 75.190400585, 44.12), x_dir=(0, -1, 0), z_dir=(0, 0, -1)), Plane(origin=(-62.526301713, 80.190400585, 44.12), x_dir=(0, 1, 0), z_dir=(0, 0, -1)), Plane(origin=(-62.526301713, 60.190400585, 44.12), x_dir=(0, 1, 0), z_dir=(0, 0, -1)), Plane(origin=(-62.526301713, -49.809599415, 44.12), x_dir=(0, 1, 0), z_dir=(0, 0, -1)), Plane(origin=(-62.526301713, -69.809599415, 44.12), x_dir=(0, 1, 0), z_dir=(0, 0, -1))) as fillet1_piece_3:
        with BuildLine():
            CenterArc((2.977225575, 3), FILLET1_R, 185.21590857, 84.78409143)
            Line((-0.010352011, 2.727272727), (-0.30910977, 2.7))
            ThreePointArc((-0.30910977, 2.7), (-0.3, 2.5), (-0.3, 0))
            Line((-0.3, 0), (0, -0.3))
            Line((0, -0.3), (2.977225575, -0.3))
            Line((2.977225575, -0.3), (2.977225575, 0))
        make_face()
    extrude(amount=8)
    with BuildSketch(Plane(origin=(-62.526301713, -74.809599415, 44.12), x_dir=(0.001326774125462656, -0.9999991198348227, 0), z_dir=(0, 0, -1))) as fillet1_piece_4:
        with BuildLine():
            CenterArc((2.980922188, -2.999162296), FILLET1_R, 88.645957159, 86.181570315)
            Line((-0.006861295, -2.72869999), (-0.305639643, -2.701653759))
            ThreePointArc((-0.305639643, -2.701653759), (-0.296682801, -2.500395832), (-0.299999736, -0.000398032))
            Line((-0.299999736, -0.000398032), (-0.000398032, 0.299999736))
            ThreePointArc((-0.000398032, 0.299999736), (2.726973031, 0.303618344), (3.058902198, 0.29991623))
            Line((3.058902198, 0.29991623), (3.051813106, 0))
        make_face()
    extrude(amount=8)


solid = part.part
